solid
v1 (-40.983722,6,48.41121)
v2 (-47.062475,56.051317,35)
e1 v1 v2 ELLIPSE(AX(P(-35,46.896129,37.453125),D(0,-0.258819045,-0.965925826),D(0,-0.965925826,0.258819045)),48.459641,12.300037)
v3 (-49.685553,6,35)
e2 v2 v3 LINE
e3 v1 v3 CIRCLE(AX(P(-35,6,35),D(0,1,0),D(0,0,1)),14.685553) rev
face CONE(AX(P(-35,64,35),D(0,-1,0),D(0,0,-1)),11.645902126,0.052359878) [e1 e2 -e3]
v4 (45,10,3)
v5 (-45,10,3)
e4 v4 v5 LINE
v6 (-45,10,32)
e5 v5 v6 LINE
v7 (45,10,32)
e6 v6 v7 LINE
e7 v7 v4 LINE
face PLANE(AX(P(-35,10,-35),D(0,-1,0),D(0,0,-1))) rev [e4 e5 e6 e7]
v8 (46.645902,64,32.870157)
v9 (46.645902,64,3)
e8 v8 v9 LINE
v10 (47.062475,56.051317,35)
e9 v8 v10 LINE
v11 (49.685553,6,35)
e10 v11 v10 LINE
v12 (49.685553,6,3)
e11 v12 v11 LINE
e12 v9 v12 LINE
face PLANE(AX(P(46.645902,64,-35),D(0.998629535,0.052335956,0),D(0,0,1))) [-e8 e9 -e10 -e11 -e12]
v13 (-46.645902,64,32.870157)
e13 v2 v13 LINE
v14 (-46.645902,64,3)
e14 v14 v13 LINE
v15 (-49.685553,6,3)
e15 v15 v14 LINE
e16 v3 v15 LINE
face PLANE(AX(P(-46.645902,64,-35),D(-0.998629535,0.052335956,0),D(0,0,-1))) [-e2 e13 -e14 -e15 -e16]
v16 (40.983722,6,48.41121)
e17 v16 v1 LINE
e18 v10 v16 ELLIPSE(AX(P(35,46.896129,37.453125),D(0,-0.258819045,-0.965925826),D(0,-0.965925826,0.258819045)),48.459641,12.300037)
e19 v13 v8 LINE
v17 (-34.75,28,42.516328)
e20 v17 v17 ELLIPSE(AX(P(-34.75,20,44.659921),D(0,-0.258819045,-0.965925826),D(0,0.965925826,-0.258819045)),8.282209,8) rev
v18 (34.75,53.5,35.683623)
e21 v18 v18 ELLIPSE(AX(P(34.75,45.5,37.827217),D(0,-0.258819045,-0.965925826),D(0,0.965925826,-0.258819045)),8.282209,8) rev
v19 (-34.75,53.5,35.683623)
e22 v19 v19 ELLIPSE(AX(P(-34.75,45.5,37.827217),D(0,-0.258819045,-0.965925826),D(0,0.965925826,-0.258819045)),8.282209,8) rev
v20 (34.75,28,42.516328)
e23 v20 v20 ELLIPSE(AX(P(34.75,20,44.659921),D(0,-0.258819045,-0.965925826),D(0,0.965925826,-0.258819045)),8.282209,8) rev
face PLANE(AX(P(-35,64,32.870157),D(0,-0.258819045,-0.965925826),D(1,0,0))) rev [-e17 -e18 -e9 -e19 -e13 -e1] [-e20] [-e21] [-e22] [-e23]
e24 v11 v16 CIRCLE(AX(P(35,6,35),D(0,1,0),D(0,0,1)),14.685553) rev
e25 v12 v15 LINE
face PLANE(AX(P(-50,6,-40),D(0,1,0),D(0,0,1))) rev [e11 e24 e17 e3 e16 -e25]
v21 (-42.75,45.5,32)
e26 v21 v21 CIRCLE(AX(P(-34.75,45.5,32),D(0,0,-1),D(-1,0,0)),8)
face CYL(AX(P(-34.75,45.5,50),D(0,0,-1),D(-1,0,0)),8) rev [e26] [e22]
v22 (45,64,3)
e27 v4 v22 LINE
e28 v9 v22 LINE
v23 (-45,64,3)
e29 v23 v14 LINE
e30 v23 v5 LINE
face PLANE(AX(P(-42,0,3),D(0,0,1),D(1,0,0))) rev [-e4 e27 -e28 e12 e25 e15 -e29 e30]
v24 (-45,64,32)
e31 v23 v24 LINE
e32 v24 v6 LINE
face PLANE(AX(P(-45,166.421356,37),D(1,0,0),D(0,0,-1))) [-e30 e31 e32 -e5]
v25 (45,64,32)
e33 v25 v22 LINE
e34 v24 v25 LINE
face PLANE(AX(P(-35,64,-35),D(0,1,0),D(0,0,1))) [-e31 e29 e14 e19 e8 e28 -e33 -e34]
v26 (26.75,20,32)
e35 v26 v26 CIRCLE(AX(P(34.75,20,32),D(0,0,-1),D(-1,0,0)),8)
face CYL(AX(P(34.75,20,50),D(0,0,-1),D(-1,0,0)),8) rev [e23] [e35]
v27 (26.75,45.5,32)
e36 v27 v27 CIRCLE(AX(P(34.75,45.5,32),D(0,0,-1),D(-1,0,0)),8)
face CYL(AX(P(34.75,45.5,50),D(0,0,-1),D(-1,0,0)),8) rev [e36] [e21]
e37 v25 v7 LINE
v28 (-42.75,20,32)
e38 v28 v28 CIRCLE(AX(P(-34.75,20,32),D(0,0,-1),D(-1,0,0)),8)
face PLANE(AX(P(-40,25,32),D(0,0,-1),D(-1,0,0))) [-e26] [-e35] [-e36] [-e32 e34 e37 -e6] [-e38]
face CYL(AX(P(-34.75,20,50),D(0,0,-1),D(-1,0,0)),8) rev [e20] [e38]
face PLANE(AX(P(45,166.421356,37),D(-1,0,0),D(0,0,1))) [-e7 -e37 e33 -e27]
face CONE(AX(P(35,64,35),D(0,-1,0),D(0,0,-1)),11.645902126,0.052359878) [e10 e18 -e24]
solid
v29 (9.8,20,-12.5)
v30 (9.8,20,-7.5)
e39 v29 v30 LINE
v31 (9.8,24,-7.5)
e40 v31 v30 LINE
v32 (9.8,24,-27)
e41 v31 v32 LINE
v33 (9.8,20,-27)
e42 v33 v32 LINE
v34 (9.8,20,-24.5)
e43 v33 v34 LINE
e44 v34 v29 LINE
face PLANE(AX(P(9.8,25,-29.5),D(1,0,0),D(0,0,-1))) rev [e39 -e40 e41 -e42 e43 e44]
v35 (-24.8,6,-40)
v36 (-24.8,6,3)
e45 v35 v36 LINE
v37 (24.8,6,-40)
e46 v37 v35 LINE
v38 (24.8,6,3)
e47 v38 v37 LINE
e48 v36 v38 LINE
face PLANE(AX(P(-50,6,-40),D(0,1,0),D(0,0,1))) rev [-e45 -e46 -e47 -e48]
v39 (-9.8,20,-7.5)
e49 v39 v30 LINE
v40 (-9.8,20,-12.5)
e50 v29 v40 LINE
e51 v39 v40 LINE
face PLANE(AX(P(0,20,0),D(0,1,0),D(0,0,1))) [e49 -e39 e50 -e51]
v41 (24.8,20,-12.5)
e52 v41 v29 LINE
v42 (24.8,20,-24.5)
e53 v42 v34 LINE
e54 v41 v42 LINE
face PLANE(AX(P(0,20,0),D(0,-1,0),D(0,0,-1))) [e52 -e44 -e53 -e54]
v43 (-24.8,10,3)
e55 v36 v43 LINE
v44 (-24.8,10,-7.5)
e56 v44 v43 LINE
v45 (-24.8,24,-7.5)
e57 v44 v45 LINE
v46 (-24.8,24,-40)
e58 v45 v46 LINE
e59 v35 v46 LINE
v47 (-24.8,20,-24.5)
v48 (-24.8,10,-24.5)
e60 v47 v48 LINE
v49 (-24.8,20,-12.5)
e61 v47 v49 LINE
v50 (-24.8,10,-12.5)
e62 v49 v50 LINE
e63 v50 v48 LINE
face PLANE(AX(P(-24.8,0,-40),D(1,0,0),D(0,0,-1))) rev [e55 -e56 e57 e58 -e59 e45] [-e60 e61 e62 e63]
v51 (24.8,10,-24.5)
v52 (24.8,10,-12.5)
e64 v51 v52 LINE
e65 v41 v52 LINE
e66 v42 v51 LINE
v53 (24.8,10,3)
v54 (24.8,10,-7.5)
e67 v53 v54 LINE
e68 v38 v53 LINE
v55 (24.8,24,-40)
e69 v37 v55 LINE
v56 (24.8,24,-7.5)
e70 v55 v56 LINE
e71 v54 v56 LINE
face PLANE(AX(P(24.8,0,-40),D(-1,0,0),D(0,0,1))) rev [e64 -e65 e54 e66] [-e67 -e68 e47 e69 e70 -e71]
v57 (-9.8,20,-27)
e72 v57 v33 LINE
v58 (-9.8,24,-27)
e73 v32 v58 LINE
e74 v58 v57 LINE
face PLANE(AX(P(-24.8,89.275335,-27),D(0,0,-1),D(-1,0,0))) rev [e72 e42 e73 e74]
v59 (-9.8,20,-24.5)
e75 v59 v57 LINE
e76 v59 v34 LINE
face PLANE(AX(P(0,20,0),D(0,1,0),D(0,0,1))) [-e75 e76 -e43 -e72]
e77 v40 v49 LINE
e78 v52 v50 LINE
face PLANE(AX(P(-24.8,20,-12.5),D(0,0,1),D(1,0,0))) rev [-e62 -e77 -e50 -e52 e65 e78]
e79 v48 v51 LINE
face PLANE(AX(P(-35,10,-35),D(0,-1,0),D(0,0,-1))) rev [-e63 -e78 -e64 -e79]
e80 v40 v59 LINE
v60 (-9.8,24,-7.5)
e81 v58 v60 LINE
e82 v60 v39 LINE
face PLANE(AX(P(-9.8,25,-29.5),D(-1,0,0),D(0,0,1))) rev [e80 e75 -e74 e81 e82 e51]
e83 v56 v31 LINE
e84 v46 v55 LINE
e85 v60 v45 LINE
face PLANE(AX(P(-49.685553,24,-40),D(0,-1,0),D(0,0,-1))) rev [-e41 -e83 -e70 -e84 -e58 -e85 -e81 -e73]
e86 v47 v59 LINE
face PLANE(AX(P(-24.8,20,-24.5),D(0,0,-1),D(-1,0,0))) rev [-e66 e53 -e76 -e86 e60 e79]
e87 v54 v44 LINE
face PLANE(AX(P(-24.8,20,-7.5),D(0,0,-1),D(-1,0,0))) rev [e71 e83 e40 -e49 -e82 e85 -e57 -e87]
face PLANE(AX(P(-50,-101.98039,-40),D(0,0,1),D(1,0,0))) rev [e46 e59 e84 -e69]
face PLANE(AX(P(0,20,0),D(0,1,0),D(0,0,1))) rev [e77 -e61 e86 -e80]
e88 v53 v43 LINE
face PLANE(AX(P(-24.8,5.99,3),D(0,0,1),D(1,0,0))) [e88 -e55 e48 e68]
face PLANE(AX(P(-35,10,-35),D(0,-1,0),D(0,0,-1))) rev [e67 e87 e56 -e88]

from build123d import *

# Parameters (mm, degrees)
BOSS_EXTRUDE1_DEPTH      = 10
SKETCH2_W                = 17.2
SKETCH2_H                = 43
CUT_EXTRUDE1_DEPTH       = 72.414284285
SKETCH3_W                = 90
SKETCH3_H                = 34
SKETCH3_W_2              = 80
SKETCH3_H_2              = 24
BOSS_EXTRUDE3_DEPTH      = 15
SKETCH4_W                = 49.6
SKETCH4_H                = 5
BOSS_EXTRUDE4_DEPTH      = 10
SKETCH5_W                = 15
SKETCH5_H                = 22
BOSS_EXTRUDE5_DEPTH      = 5
SKETCH6_W                = 90
SKETCH6_H                = 77
BOSS_EXTRUDE6_DEPTH      = 15
BOSS_EXTRUDE8_DEPTH      = 39
CHAMFER1_SIZE            = 64
CHAMFER1_SIZE_2          = 3.354097874
CHAMFER3_SIZE            = 64
CHAMFER3_SIZE_2          = 13.775745352
CUT_EXTRUDE6_DEPTH       = 2.5
CUT_EXTRUDE8_DEPTH       = 15
CUT_EXTRUDE9_DEPTH       = 15
SKETCH22_W               = 30
SKETCH22_H               = 7
CUT_EXTRUDE10_DEPTH      = 10
SKETCH25_R               = 8
CUT_EXTRUDE19_DEPTH      = 116.41230437
SKETCH29_W               = 9
SKETCH29_H               = 29
BOSS_EXTRUDE10_DEPTH     = 28
SKETCH31_W               = 49.6
SKETCH31_H               = 13
BOSS_EXTRUDE12_DEPTH     = 28
SKETCH30_W               = 49.6
SKETCH30_H               = 4
SKETCH30_W_2             = 48
BOSS_EXTRUDE11_DEPTH     = 10
SKETCH33_W               = 15
SKETCH33_H               = 19.5
BOSS_EXTRUDE13_DEPTH     = 13
SKETCH23_W               = 30
SKETCH23_H               = 28.995403325
CUT_EXTRUDE17_DEPTH      = 5
SKETCH34_W               = 9.8
SKETCH34_H               = 10.5
BOSS_EXTRUDE14_DEPTH     = 28
SKETCH35_W               = 30
SKETCH35_H               = 10.5
CUT_EXTRUDE22_DEPTH      = 5
SKETCH37_W               = 30
SKETCH37_H               = 32.5
BOSS_EXTRUDE15_DEPTH     = 5
SKETCH38_W               = 100
SKETCH38_H               = 20
CUT_EXTRUDE23_DEPTH      = 64
SKETCH39_W               = 8
SKETCH39_H               = 43
CUT_EXTRUDE24_DEPTH      = 64
CUT_EXTRUDE25_REACH      = 111.873
SKETCH40_W               = 23
SKETCH40_H               = 22
CUT_EXTRUDE26_DEPTH      = 62
SKETCH42_W               = 48
SKETCH42_H               = 29
CUT_EXTRUDE27_DEPTH      = 28
CUT_EXTRUDE28_DEPTH      = 111.413042708
CUT_EXTRUDE28_DEPTH_BACK = 111.413042708
SKETCH43_W               = 90
SKETCH43_H               = 6
CUT_EXTRUDE29_DEPTH      = 110.488551462
CUT_EXTRUDE29_DEPTH_BACK = 110.488551462
SKETCH44_W               = 43
SKETCH44_H               = 24
SKETCH45_W               = 30
SKETCH45_H               = 7
BOSS_EXTRUDE16_DEPTH     = 4
SKETCH46_W               = 49.6
SKETCH46_H               = 10.5
CUT_EXTRUDE30_DEPTH      = 14
SPLIT1_SURFACE_1_BACK    = 146.104
SPLIT1_SURFACE_1_DEPTH   = 292.208
SPLIT1_SURFACE_2_BACK    = 146.104
SPLIT1_SURFACE_2_DEPTH   = 292.208


with BuildPart() as part:
    # Sketch1 → Boss-Extrude1 (new body)
    with BuildSketch(Plane(origin=(0, 0, 0), x_dir=(1, 0, 0), z_dir=(0, 1, 0))):
        with BuildLine():
            Line((-35, 50), (35, 50))
            ThreePointArc((35, 50), (45.606601718, 45.606601718), (50, 35))
            Line((50, 35), (50, -35))
            ThreePointArc((50, -35), (45.606601718, -45.606601718), (35, -50))
            Line((35, -50), (-35, -50))
            ThreePointArc((-35, -50), (-45.606601718, -45.606601718), (-50, -35))
            Line((-50, -35), (-50, 35))
            ThreePointArc((-50, 35), (-45.606601718, 45.606601718), (-35, 50))
        make_face()
    extrude(amount=BOSS_EXTRUDE1_DEPTH)

    # Sketch2 → Cut-Extrude1 (cut, through all)
    with BuildSketch(Plane(origin=(0, 10, 0), x_dir=(1, 0, 0), z_dir=(0, 1, 0))):
        with Locations((-33.4, 18.5)):
            Rectangle(SKETCH2_W, SKETCH2_H)
        with Locations((33.4, 18.5)):
            Rectangle(SKETCH2_W, SKETCH2_H)
    extrude(amount=-CUT_EXTRUDE1_DEPTH, mode=Mode.SUBTRACT)

    # Sketch3 → Boss-Extrude3 (add)
    with BuildSketch(Plane(origin=(0, 10, 0), x_dir=(1, 0, 0), z_dir=(0, 1, 0))):
        with Locations((0, -20)):
            Rectangle(SKETCH3_W, SKETCH3_H)
        with Locations((0, -20)):
            Rectangle(SKETCH3_W_2, SKETCH3_H_2, mode=Mode.SUBTRACT)
    extrude(amount=BOSS_EXTRUDE3_DEPTH)

    # Sketch4 → Boss-Extrude4 (add)
    with BuildSketch(Plane(origin=(0, 10, 0), x_dir=(1, 0, 0), z_dir=(0, 1, 0))):
        with Locations((0, 10)):
            Rectangle(SKETCH4_W, SKETCH4_H)
        with Locations((0, 27)):
            Rectangle(SKETCH4_W, SKETCH4_H)
    extrude(amount=BOSS_EXTRUDE4_DEPTH)

    # Sketch5 → Boss-Extrude5 (add)
    with BuildSketch(Plane(origin=(0, 20, 0), x_dir=(1, 0, 0), z_dir=(0, 1, 0))):
        with Locations((-17.3, 18.5)):
            Rectangle(SKETCH5_W, SKETCH5_H)
        with Locations((17.3, 18.5)):
            Rectangle(SKETCH5_W, SKETCH5_H)
    extrude(amount=BOSS_EXTRUDE5_DEPTH)

    # Sketch6 → Boss-Extrude6 (add)
    with BuildSketch(Plane(origin=(0, 10, 0), x_dir=(1, 0, 0), z_dir=(0, 1, 0))):
        with BuildLine():
            Line((-50, 35), (-50, -35))
            ThreePointArc((-50, -35), (-45.606601718, -45.606601718), (-35, -50))
            Line((-35, -50), (35, -50))
            ThreePointArc((35, -50), (45.606601718, -45.606601718), (50, -35))
            Line((50, -35), (50, 35))
            ThreePointArc((50, 35), (45.606601718, 45.606601718), (35, 50))
            Line((35, 50), (-35, 50))
            ThreePointArc((-35, 50), (-45.606601718, 45.606601718), (-50, 35))
        make_face()
        with Locations((0, 1.5)):
            Rectangle(SKETCH6_W, SKETCH6_H, mode=Mode.SUBTRACT)
    extrude(amount=BOSS_EXTRUDE6_DEPTH)

    # Sketch9 → Boss-Extrude8 (add)
    with BuildSketch(Plane(origin=(0, 25, 0), x_dir=(1, 0, 0), z_dir=(0, 1, 0))):
        with BuildLine():
            Line((-50, 35), (-50, -35))
            ThreePointArc((-50, -35), (-45.606601718, -45.606601718), (-35, -50))
            Line((-35, -50), (35, -50))
            ThreePointArc((35, -50), (45.606601718, -45.606601718), (50, -35))
            Line((50, -35), (50, 35))
            ThreePointArc((50, 35), (45.606601718, 45.606601718), (35, 50))
            Line((35, 50), (-35, 50))
            ThreePointArc((-35, 50), (-45.606601718, 45.606601718), (-50, 35))
        make_face()
        with BuildLine():
            Line((-45, 35), (-45, -32))
            Line((-45, -32), (45, -32))
            Line((45, -32), (45, 35))
            ThreePointArc((45, 35), (44.659258263, 37.588190451), (43.660254038, 40))
            Line((43.660254038, 40), (-43.660254038, 40))
            ThreePointArc((-43.660254038, 40), (-44.659258263, 37.588190451), (-45, 35))
        make_face(mode=Mode.SUBTRACT)
    extrude(amount=BOSS_EXTRUDE8_DEPTH)

    # Chamfer1
    # the kernel refuses this chamfer: 64, 3.354097874 mm, written as the material it takes off along each edge
    with BuildSketch(Plane(origin=(-35, 64, 50), x_dir=(0, -0.9999979738662979, 0.002013023422382214), z_dir=(1, 0, 0)), Plane(origin=(50, 64, 35), x_dir=(0.002013023422382214, -0.9999979738662979, 0), z_dir=(0, 0, -1)), Plane(origin=(-50, 64, -35), x_dir=(-0.002013023422382214, -0.9999979738662979, 0), z_dir=(0, 0, 1)), Plane(origin=(35, 64, -50), x_dir=(0, -0.9999979738662979, -0.002013023422382214), z_dir=(-1, 0, 0))) as chamfer1_piece_1:
        Polygon((CHAMFER1_SIZE * 0.999997973866, CHAMFER1_SIZE * 0.00201302342238), (-CHAMFER1_SIZE_2 * 0.00201302342245, CHAMFER1_SIZE_2 * 0.9999979739), (0, 0), align=None)
    extrude(amount=70, mode=Mode.SUBTRACT)
    with BuildSketch(Plane(origin=(35, 64, 35), x_dir=(0, 0, 1), z_dir=(-1, 0, 0))) as chamfer1_piece_2:
        Polygon((15, -CHAMFER1_SIZE), (15 - CHAMFER1_SIZE_2, 0), (15, 0), align=None)
    revolve(axis=Axis((35, 64, 35), (0, 1, 0)), revolution_arc=90, mode=Mode.SUBTRACT)
    with BuildSketch(Plane(origin=(-35, 64, 35), x_dir=(-1, 0, 0), z_dir=(0, 0, -1))) as chamfer1_piece_3:
        Polygon((15, -CHAMFER1_SIZE), (15 - CHAMFER1_SIZE_2, 0), (15, 0), align=None)
    revolve(axis=Axis((-35, 64, 35), (0, 1, 0)), revolution_arc=90, mode=Mode.SUBTRACT)
    with BuildSketch(Plane(origin=(35, 64, -35), x_dir=(1, 0, 0), z_dir=(0, 0, 1))) as chamfer1_piece_4:
        Polygon((15, -CHAMFER1_SIZE), (15 - CHAMFER1_SIZE_2, 0), (15, 0), align=None)
    revolve(axis=Axis((35, 64, -35), (0, 1, 0)), revolution_arc=90, mode=Mode.SUBTRACT)
    with BuildSketch(Plane(origin=(-35, 64, -35), x_dir=(0, 0, -1), z_dir=(1, 0, 0))) as chamfer1_piece_5:
        Polygon((15 - CHAMFER1_SIZE_2, 0), (15, -CHAMFER1_SIZE), (15, 0), align=None)
    revolve(axis=Axis((-35, 64, -35), (0, 1, 0)), revolution_arc=90, mode=Mode.SUBTRACT)

    # Chamfer3
    # the kernel refuses this chamfer: 64, 13.775745352 mm, written as the material it takes off along each edge
    with BuildSketch(Plane(origin=(-201.265469314, 64, 46.645902126), x_dir=(0, -0.9981787050157903, 0.06032638604292662), z_dir=(1, 0, 0))) as chamfer3_piece_1:
        Polygon((CHAMFER3_SIZE * 0.999967974892, CHAMFER3_SIZE * 0.00800307379952), (-CHAMFER3_SIZE_2 * 0.060326386045, CHAMFER3_SIZE_2 * 0.99817870505), (0, 0), align=None)
    extrude(amount=402.530938629, mode=Mode.SUBTRACT)

    # Sketch17 → Cut-Extrude6 (cut)
    with BuildSketch(Plane(origin=(0, 0, -29.5), x_dir=(-1, 0, 0), z_dir=(0, 0, -1))):
        Polygon((-24.8, 10), (24.8, 10), (24.8, 25), (9.8, 25), (9.8, 20), (-9.8, 20), (-9.8, 25), (-24.8, 25), align=None)
    extrude(amount=-CUT_EXTRUDE6_DEPTH, mode=Mode.SUBTRACT)

    # Sketch20 → Cut-Extrude8 (cut)
    with BuildSketch(Plane.XZ.offset(-25)):
        with BuildLine():
            Line((-45, -35), (-45, -40))
            Line((-45, -40), (-43.660254038, -40))
            ThreePointArc((-43.660254038, -40), (-44.659258263, -37.588190451), (-45, -35))
        make_face()
        with BuildLine():
            Line((45, -40), (45, -35))
            ThreePointArc((45, -35), (44.659258263, -37.588190451), (43.660254038, -40))
            Line((43.660254038, -40), (45, -40))
        make_face()
    extrude(amount=-CUT_EXTRUDE8_DEPTH, mode=Mode.SUBTRACT)

    # Sketch21 → Cut-Extrude9 (cut)
    with BuildSketch(Plane(origin=(0, 25, 0), x_dir=(1, 0, 0), z_dir=(0, 1, 0))):
        Polygon((40, -8), (40, -32), (45, -32), (45, -3), (-45, -3), (-45, -32), (-40, -32), (-40, -8), align=None)
    extrude(amount=-CUT_EXTRUDE9_DEPTH, mode=Mode.SUBTRACT)

    # Sketch22 → Cut-Extrude10 (cut)
    with BuildSketch(Plane.XZ):
        with Locations((0, 28.5)):
            Rectangle(SKETCH22_W, SKETCH22_H)
    extrude(amount=-CUT_EXTRUDE10_DEPTH, mode=Mode.SUBTRACT)

    # Sketch25 → Cut-Extrude19 (cut, through all)
    with BuildSketch(Plane(origin=(0, 0, 32), x_dir=(-1, 0, 0), z_dir=(0, 0, -1))):
        with Locations((-34.75, 45.5)):
            Circle(SKETCH25_R)
        with Locations((34.75, 45.5)):
            Circle(SKETCH25_R)
        with Locations((-34.75, 20)):
            Circle(SKETCH25_R)
        with Locations((34.75, 20)):
            Circle(SKETCH25_R)
    extrude(amount=-CUT_EXTRUDE19_DEPTH, mode=Mode.SUBTRACT)

    # Sketch29 → Boss-Extrude10 (add)
    with BuildSketch(Plane(origin=(0, 10, 0), x_dir=(1, 0, 0), z_dir=(0, 1, 0))):
        with Locations((-19.5, -17.5)):
            Rectangle(SKETCH29_W, SKETCH29_H)
        with Locations((19.5, -17.5)):
            Rectangle(SKETCH29_W, SKETCH29_H)
    extrude(amount=BOSS_EXTRUDE10_DEPTH)

    # Sketch31 → Boss-Extrude12 (add)
    with BuildSketch(Plane(origin=(0, 10, 0), x_dir=(1, 0, 0), z_dir=(0, 1, 0))):
        with Locations((0, 33.5)):
            Rectangle(SKETCH31_W, SKETCH31_H)
    extrude(amount=BOSS_EXTRUDE12_DEPTH)

    # Sketch30 → Boss-Extrude11 (add)
    with BuildSketch(Plane(origin=(0, 38, 0), x_dir=(1, 0, 0), z_dir=(0, 1, 0))):
        with Locations((0, 38)):
            Rectangle(SKETCH30_W, SKETCH30_H)
        with Locations((0, -20)):
            Rectangle(SKETCH30_W_2, SKETCH30_H)
    extrude(amount=BOSS_EXTRUDE11_DEPTH)

    # Sketch33 → Boss-Extrude13 (add)
    with BuildSketch(Plane(origin=(0, 25, 0), x_dir=(1, 0, 0), z_dir=(0, 1, 0))):
        with Locations((17.3, 17.25)):
            Rectangle(SKETCH33_W, SKETCH33_H)
        with Locations((-17.3, 17.25)):
            Rectangle(SKETCH33_W, SKETCH33_H)
    extrude(amount=BOSS_EXTRUDE13_DEPTH)

    # Sketch23 → Cut-Extrude17 (cut)
    with BuildSketch(Plane(origin=(0, 10, 0), x_dir=(1, 0, 0), z_dir=(0, 1, 0))):
        with Locations((0, -17.497701662)):
            Rectangle(SKETCH23_W, SKETCH23_H)
    extrude(amount=-CUT_EXTRUDE17_DEPTH, mode=Mode.SUBTRACT)

    # Sketch34 → Boss-Extrude14 (add)
    with BuildSketch(Plane(origin=(0, 10, 0), x_dir=(1, 0, 0), z_dir=(0, 1, 0))):
        with Locations((-19.9, 2.25)):
            Rectangle(SKETCH34_W, SKETCH34_H)
        with Locations((19.9, 2.25)):
            Rectangle(SKETCH34_W, SKETCH34_H)
    extrude(amount=BOSS_EXTRUDE14_DEPTH)

    # Sketch35 → Cut-Extrude22 (cut)
    with BuildSketch(Plane(origin=(0, 10, 0), x_dir=(1, 0, 0), z_dir=(0, 1, 0))):
        with Locations((0, 2.25)):
            Rectangle(SKETCH35_W, SKETCH35_H)
    extrude(amount=-CUT_EXTRUDE22_DEPTH, mode=Mode.SUBTRACT)

    # Sketch37 → Boss-Extrude15 (add)
    with BuildSketch(Plane(origin=(0, 5, 0), x_dir=(1, 0, 0), z_dir=(0, 1, 0))):
        with Locations((0, -8.75)):
            Rectangle(SKETCH37_W, SKETCH37_H)
    extrude(amount=BOSS_EXTRUDE15_DEPTH)

    # Sketch38 → Cut-Extrude23 (cut)
    with BuildSketch(Plane(origin=(0, 64, 0), x_dir=(1, 0, 0), z_dir=(0, 1, 0))):
        with Locations((0, 50)):
            Rectangle(SKETCH38_W, SKETCH38_H)
    extrude(amount=-CUT_EXTRUDE23_DEPTH, mode=Mode.SUBTRACT)

    # Sketch39 → Cut-Extrude24 (cut)
    with BuildSketch(Plane.XZ):
        with Locations((-46, -18.5)):
            Rectangle(SKETCH39_W, SKETCH39_H)
        with Locations((46, -18.5)):
            Rectangle(SKETCH39_W, SKETCH39_H)
    extrude(amount=-CUT_EXTRUDE24_DEPTH, mode=Mode.SUBTRACT)

    # Cut-Extrude25: up to this face of the body (flat: up to its plane)
    cut_extrude25_end = Plane(part.part.faces().sort_by_distance((24, 24.892018779, 17.617370892))[0])
    # Sketch40 → Cut-Extrude25 (cut, up to the picked face)
    with BuildSketch(Plane.ZY.offset(24), mode=Mode.PRIVATE) as cut_extrude25_sk1:
        with Locations((17.5, 24)):
            Rectangle(SKETCH40_W, SKETCH40_H)
    cut_extrude25_tool1 = split(extrude(cut_extrude25_sk1.sketch, amount=-CUT_EXTRUDE25_REACH, mode=Mode.PRIVATE), bisect_by=cut_extrude25_end, keep=Keep.BOTH, mode=Mode.PRIVATE)
    add(cut_extrude25_tool1.solids().sort_by(Axis((-24, 24, 17.5), (1, 0, 0)))[0], mode=Mode.SUBTRACT)

    # Sketch41 → Cut-Extrude26 (cut)
    with BuildSketch(Plane.XY.offset(22)):
        Polygon((-24, 38), (-15, 38), (15, 38), (24, 38), (24, 48), (-24, 48), align=None)
    extrude(amount=-CUT_EXTRUDE26_DEPTH, mode=Mode.SUBTRACT)

    # Sketch42 → Cut-Extrude27 (cut)
    with BuildSketch(Plane(origin=(0, 38, 0), x_dir=(1, 0, 0), z_dir=(0, 1, 0))):
        with Locations((0, -17.5)):
            Rectangle(SKETCH42_W, SKETCH42_H)
    extrude(amount=-CUT_EXTRUDE27_DEPTH, mode=Mode.SUBTRACT)

    # Sketch43 → Cut-Extrude28 (cut, two sides: drawn at the far end of the back side and taken through both)
    with BuildSketch(Plane(origin=(24.8, 0, 0), x_dir=(0, 0, -1), z_dir=(1, 0, 0)).offset(-CUT_EXTRUDE28_DEPTH_BACK)):
        with Locations((-5, 3)):
            Rectangle(SKETCH43_W, SKETCH43_H)
    extrude(amount=CUT_EXTRUDE28_DEPTH + CUT_EXTRUDE28_DEPTH_BACK, mode=Mode.SUBTRACT)

    # Sketch44 → Cut-Extrude29 (cut, two sides: drawn at the far end of the back side and taken through both)
    with BuildSketch(Plane(origin=(24.8, 0, 0), x_dir=(0, 0, -1), z_dir=(1, 0, 0)).offset(-CUT_EXTRUDE29_DEPTH_BACK)):
        with Locations((18.5, 36)):
            Rectangle(SKETCH44_W, SKETCH44_H)
    extrude(amount=CUT_EXTRUDE29_DEPTH + CUT_EXTRUDE29_DEPTH_BACK, mode=Mode.SUBTRACT)

    # Sketch45 → Boss-Extrude16 (add)
    with BuildSketch(Plane(origin=(0, 10, 0), x_dir=(1, 0, 0), z_dir=(0, 1, 0))):
        with Locations((0, -28.5)):
            Rectangle(SKETCH45_W, SKETCH45_H)
    extrude(amount=-BOSS_EXTRUDE16_DEPTH)

    # Sketch46 → Cut-Extrude30 (cut)
    with BuildSketch(Plane(origin=(0, 24, 0), x_dir=(1, 0, 0), z_dir=(0, 1, 0))):
        with Locations((0, 2.25)):
            Rectangle(SKETCH46_W, SKETCH46_H)
    extrude(amount=-CUT_EXTRUDE30_DEPTH, mode=Mode.SUBTRACT)


with BuildPart() as body_2:
    # Split1: the piece behind the surface
    add(part.part)
    # Split1 surface: a surface, the sketch's curves swept straight by 292.208 mm
    with BuildLine(Plane(origin=(0, 10, 0), x_dir=(1, 0, 0), z_dir=(0, 1, 0)).offset(-SPLIT1_SURFACE_1_BACK), mode=Mode.PRIVATE) as split1_surface_1_path:
        Line((-24.8, -3), (24.8, -3))
    split1_surface_1 = Shell.extrude(split1_surface_1_path.wire(), (0 * SPLIT1_SURFACE_1_DEPTH, 1 * SPLIT1_SURFACE_1_DEPTH, 0 * SPLIT1_SURFACE_1_DEPTH))
    split(bisect_by=split1_surface_1, keep=Keep.BOTTOM)


with BuildPart() as part_1:
    add(part.part)

    # Split1: split by a surface, the side it looks to stays
    # Split1 surface: a surface, the sketch's curves swept straight by 292.208 mm
    with BuildLine(Plane(origin=(0, 10, 0), x_dir=(1, 0, 0), z_dir=(0, 1, 0)).offset(-SPLIT1_SURFACE_2_BACK), mode=Mode.PRIVATE) as split1_surface_2_path:
        Line((-24.8, -3), (24.8, -3))
    split1_surface_2 = Shell.extrude(split1_surface_2_path.wire(), (0 * SPLIT1_SURFACE_2_DEPTH, 1 * SPLIT1_SURFACE_2_DEPTH, 0 * SPLIT1_SURFACE_2_DEPTH))
    split(bisect_by=split1_surface_2, keep=Keep.TOP)


solid = Compound([body_2.part, part_1.part])
